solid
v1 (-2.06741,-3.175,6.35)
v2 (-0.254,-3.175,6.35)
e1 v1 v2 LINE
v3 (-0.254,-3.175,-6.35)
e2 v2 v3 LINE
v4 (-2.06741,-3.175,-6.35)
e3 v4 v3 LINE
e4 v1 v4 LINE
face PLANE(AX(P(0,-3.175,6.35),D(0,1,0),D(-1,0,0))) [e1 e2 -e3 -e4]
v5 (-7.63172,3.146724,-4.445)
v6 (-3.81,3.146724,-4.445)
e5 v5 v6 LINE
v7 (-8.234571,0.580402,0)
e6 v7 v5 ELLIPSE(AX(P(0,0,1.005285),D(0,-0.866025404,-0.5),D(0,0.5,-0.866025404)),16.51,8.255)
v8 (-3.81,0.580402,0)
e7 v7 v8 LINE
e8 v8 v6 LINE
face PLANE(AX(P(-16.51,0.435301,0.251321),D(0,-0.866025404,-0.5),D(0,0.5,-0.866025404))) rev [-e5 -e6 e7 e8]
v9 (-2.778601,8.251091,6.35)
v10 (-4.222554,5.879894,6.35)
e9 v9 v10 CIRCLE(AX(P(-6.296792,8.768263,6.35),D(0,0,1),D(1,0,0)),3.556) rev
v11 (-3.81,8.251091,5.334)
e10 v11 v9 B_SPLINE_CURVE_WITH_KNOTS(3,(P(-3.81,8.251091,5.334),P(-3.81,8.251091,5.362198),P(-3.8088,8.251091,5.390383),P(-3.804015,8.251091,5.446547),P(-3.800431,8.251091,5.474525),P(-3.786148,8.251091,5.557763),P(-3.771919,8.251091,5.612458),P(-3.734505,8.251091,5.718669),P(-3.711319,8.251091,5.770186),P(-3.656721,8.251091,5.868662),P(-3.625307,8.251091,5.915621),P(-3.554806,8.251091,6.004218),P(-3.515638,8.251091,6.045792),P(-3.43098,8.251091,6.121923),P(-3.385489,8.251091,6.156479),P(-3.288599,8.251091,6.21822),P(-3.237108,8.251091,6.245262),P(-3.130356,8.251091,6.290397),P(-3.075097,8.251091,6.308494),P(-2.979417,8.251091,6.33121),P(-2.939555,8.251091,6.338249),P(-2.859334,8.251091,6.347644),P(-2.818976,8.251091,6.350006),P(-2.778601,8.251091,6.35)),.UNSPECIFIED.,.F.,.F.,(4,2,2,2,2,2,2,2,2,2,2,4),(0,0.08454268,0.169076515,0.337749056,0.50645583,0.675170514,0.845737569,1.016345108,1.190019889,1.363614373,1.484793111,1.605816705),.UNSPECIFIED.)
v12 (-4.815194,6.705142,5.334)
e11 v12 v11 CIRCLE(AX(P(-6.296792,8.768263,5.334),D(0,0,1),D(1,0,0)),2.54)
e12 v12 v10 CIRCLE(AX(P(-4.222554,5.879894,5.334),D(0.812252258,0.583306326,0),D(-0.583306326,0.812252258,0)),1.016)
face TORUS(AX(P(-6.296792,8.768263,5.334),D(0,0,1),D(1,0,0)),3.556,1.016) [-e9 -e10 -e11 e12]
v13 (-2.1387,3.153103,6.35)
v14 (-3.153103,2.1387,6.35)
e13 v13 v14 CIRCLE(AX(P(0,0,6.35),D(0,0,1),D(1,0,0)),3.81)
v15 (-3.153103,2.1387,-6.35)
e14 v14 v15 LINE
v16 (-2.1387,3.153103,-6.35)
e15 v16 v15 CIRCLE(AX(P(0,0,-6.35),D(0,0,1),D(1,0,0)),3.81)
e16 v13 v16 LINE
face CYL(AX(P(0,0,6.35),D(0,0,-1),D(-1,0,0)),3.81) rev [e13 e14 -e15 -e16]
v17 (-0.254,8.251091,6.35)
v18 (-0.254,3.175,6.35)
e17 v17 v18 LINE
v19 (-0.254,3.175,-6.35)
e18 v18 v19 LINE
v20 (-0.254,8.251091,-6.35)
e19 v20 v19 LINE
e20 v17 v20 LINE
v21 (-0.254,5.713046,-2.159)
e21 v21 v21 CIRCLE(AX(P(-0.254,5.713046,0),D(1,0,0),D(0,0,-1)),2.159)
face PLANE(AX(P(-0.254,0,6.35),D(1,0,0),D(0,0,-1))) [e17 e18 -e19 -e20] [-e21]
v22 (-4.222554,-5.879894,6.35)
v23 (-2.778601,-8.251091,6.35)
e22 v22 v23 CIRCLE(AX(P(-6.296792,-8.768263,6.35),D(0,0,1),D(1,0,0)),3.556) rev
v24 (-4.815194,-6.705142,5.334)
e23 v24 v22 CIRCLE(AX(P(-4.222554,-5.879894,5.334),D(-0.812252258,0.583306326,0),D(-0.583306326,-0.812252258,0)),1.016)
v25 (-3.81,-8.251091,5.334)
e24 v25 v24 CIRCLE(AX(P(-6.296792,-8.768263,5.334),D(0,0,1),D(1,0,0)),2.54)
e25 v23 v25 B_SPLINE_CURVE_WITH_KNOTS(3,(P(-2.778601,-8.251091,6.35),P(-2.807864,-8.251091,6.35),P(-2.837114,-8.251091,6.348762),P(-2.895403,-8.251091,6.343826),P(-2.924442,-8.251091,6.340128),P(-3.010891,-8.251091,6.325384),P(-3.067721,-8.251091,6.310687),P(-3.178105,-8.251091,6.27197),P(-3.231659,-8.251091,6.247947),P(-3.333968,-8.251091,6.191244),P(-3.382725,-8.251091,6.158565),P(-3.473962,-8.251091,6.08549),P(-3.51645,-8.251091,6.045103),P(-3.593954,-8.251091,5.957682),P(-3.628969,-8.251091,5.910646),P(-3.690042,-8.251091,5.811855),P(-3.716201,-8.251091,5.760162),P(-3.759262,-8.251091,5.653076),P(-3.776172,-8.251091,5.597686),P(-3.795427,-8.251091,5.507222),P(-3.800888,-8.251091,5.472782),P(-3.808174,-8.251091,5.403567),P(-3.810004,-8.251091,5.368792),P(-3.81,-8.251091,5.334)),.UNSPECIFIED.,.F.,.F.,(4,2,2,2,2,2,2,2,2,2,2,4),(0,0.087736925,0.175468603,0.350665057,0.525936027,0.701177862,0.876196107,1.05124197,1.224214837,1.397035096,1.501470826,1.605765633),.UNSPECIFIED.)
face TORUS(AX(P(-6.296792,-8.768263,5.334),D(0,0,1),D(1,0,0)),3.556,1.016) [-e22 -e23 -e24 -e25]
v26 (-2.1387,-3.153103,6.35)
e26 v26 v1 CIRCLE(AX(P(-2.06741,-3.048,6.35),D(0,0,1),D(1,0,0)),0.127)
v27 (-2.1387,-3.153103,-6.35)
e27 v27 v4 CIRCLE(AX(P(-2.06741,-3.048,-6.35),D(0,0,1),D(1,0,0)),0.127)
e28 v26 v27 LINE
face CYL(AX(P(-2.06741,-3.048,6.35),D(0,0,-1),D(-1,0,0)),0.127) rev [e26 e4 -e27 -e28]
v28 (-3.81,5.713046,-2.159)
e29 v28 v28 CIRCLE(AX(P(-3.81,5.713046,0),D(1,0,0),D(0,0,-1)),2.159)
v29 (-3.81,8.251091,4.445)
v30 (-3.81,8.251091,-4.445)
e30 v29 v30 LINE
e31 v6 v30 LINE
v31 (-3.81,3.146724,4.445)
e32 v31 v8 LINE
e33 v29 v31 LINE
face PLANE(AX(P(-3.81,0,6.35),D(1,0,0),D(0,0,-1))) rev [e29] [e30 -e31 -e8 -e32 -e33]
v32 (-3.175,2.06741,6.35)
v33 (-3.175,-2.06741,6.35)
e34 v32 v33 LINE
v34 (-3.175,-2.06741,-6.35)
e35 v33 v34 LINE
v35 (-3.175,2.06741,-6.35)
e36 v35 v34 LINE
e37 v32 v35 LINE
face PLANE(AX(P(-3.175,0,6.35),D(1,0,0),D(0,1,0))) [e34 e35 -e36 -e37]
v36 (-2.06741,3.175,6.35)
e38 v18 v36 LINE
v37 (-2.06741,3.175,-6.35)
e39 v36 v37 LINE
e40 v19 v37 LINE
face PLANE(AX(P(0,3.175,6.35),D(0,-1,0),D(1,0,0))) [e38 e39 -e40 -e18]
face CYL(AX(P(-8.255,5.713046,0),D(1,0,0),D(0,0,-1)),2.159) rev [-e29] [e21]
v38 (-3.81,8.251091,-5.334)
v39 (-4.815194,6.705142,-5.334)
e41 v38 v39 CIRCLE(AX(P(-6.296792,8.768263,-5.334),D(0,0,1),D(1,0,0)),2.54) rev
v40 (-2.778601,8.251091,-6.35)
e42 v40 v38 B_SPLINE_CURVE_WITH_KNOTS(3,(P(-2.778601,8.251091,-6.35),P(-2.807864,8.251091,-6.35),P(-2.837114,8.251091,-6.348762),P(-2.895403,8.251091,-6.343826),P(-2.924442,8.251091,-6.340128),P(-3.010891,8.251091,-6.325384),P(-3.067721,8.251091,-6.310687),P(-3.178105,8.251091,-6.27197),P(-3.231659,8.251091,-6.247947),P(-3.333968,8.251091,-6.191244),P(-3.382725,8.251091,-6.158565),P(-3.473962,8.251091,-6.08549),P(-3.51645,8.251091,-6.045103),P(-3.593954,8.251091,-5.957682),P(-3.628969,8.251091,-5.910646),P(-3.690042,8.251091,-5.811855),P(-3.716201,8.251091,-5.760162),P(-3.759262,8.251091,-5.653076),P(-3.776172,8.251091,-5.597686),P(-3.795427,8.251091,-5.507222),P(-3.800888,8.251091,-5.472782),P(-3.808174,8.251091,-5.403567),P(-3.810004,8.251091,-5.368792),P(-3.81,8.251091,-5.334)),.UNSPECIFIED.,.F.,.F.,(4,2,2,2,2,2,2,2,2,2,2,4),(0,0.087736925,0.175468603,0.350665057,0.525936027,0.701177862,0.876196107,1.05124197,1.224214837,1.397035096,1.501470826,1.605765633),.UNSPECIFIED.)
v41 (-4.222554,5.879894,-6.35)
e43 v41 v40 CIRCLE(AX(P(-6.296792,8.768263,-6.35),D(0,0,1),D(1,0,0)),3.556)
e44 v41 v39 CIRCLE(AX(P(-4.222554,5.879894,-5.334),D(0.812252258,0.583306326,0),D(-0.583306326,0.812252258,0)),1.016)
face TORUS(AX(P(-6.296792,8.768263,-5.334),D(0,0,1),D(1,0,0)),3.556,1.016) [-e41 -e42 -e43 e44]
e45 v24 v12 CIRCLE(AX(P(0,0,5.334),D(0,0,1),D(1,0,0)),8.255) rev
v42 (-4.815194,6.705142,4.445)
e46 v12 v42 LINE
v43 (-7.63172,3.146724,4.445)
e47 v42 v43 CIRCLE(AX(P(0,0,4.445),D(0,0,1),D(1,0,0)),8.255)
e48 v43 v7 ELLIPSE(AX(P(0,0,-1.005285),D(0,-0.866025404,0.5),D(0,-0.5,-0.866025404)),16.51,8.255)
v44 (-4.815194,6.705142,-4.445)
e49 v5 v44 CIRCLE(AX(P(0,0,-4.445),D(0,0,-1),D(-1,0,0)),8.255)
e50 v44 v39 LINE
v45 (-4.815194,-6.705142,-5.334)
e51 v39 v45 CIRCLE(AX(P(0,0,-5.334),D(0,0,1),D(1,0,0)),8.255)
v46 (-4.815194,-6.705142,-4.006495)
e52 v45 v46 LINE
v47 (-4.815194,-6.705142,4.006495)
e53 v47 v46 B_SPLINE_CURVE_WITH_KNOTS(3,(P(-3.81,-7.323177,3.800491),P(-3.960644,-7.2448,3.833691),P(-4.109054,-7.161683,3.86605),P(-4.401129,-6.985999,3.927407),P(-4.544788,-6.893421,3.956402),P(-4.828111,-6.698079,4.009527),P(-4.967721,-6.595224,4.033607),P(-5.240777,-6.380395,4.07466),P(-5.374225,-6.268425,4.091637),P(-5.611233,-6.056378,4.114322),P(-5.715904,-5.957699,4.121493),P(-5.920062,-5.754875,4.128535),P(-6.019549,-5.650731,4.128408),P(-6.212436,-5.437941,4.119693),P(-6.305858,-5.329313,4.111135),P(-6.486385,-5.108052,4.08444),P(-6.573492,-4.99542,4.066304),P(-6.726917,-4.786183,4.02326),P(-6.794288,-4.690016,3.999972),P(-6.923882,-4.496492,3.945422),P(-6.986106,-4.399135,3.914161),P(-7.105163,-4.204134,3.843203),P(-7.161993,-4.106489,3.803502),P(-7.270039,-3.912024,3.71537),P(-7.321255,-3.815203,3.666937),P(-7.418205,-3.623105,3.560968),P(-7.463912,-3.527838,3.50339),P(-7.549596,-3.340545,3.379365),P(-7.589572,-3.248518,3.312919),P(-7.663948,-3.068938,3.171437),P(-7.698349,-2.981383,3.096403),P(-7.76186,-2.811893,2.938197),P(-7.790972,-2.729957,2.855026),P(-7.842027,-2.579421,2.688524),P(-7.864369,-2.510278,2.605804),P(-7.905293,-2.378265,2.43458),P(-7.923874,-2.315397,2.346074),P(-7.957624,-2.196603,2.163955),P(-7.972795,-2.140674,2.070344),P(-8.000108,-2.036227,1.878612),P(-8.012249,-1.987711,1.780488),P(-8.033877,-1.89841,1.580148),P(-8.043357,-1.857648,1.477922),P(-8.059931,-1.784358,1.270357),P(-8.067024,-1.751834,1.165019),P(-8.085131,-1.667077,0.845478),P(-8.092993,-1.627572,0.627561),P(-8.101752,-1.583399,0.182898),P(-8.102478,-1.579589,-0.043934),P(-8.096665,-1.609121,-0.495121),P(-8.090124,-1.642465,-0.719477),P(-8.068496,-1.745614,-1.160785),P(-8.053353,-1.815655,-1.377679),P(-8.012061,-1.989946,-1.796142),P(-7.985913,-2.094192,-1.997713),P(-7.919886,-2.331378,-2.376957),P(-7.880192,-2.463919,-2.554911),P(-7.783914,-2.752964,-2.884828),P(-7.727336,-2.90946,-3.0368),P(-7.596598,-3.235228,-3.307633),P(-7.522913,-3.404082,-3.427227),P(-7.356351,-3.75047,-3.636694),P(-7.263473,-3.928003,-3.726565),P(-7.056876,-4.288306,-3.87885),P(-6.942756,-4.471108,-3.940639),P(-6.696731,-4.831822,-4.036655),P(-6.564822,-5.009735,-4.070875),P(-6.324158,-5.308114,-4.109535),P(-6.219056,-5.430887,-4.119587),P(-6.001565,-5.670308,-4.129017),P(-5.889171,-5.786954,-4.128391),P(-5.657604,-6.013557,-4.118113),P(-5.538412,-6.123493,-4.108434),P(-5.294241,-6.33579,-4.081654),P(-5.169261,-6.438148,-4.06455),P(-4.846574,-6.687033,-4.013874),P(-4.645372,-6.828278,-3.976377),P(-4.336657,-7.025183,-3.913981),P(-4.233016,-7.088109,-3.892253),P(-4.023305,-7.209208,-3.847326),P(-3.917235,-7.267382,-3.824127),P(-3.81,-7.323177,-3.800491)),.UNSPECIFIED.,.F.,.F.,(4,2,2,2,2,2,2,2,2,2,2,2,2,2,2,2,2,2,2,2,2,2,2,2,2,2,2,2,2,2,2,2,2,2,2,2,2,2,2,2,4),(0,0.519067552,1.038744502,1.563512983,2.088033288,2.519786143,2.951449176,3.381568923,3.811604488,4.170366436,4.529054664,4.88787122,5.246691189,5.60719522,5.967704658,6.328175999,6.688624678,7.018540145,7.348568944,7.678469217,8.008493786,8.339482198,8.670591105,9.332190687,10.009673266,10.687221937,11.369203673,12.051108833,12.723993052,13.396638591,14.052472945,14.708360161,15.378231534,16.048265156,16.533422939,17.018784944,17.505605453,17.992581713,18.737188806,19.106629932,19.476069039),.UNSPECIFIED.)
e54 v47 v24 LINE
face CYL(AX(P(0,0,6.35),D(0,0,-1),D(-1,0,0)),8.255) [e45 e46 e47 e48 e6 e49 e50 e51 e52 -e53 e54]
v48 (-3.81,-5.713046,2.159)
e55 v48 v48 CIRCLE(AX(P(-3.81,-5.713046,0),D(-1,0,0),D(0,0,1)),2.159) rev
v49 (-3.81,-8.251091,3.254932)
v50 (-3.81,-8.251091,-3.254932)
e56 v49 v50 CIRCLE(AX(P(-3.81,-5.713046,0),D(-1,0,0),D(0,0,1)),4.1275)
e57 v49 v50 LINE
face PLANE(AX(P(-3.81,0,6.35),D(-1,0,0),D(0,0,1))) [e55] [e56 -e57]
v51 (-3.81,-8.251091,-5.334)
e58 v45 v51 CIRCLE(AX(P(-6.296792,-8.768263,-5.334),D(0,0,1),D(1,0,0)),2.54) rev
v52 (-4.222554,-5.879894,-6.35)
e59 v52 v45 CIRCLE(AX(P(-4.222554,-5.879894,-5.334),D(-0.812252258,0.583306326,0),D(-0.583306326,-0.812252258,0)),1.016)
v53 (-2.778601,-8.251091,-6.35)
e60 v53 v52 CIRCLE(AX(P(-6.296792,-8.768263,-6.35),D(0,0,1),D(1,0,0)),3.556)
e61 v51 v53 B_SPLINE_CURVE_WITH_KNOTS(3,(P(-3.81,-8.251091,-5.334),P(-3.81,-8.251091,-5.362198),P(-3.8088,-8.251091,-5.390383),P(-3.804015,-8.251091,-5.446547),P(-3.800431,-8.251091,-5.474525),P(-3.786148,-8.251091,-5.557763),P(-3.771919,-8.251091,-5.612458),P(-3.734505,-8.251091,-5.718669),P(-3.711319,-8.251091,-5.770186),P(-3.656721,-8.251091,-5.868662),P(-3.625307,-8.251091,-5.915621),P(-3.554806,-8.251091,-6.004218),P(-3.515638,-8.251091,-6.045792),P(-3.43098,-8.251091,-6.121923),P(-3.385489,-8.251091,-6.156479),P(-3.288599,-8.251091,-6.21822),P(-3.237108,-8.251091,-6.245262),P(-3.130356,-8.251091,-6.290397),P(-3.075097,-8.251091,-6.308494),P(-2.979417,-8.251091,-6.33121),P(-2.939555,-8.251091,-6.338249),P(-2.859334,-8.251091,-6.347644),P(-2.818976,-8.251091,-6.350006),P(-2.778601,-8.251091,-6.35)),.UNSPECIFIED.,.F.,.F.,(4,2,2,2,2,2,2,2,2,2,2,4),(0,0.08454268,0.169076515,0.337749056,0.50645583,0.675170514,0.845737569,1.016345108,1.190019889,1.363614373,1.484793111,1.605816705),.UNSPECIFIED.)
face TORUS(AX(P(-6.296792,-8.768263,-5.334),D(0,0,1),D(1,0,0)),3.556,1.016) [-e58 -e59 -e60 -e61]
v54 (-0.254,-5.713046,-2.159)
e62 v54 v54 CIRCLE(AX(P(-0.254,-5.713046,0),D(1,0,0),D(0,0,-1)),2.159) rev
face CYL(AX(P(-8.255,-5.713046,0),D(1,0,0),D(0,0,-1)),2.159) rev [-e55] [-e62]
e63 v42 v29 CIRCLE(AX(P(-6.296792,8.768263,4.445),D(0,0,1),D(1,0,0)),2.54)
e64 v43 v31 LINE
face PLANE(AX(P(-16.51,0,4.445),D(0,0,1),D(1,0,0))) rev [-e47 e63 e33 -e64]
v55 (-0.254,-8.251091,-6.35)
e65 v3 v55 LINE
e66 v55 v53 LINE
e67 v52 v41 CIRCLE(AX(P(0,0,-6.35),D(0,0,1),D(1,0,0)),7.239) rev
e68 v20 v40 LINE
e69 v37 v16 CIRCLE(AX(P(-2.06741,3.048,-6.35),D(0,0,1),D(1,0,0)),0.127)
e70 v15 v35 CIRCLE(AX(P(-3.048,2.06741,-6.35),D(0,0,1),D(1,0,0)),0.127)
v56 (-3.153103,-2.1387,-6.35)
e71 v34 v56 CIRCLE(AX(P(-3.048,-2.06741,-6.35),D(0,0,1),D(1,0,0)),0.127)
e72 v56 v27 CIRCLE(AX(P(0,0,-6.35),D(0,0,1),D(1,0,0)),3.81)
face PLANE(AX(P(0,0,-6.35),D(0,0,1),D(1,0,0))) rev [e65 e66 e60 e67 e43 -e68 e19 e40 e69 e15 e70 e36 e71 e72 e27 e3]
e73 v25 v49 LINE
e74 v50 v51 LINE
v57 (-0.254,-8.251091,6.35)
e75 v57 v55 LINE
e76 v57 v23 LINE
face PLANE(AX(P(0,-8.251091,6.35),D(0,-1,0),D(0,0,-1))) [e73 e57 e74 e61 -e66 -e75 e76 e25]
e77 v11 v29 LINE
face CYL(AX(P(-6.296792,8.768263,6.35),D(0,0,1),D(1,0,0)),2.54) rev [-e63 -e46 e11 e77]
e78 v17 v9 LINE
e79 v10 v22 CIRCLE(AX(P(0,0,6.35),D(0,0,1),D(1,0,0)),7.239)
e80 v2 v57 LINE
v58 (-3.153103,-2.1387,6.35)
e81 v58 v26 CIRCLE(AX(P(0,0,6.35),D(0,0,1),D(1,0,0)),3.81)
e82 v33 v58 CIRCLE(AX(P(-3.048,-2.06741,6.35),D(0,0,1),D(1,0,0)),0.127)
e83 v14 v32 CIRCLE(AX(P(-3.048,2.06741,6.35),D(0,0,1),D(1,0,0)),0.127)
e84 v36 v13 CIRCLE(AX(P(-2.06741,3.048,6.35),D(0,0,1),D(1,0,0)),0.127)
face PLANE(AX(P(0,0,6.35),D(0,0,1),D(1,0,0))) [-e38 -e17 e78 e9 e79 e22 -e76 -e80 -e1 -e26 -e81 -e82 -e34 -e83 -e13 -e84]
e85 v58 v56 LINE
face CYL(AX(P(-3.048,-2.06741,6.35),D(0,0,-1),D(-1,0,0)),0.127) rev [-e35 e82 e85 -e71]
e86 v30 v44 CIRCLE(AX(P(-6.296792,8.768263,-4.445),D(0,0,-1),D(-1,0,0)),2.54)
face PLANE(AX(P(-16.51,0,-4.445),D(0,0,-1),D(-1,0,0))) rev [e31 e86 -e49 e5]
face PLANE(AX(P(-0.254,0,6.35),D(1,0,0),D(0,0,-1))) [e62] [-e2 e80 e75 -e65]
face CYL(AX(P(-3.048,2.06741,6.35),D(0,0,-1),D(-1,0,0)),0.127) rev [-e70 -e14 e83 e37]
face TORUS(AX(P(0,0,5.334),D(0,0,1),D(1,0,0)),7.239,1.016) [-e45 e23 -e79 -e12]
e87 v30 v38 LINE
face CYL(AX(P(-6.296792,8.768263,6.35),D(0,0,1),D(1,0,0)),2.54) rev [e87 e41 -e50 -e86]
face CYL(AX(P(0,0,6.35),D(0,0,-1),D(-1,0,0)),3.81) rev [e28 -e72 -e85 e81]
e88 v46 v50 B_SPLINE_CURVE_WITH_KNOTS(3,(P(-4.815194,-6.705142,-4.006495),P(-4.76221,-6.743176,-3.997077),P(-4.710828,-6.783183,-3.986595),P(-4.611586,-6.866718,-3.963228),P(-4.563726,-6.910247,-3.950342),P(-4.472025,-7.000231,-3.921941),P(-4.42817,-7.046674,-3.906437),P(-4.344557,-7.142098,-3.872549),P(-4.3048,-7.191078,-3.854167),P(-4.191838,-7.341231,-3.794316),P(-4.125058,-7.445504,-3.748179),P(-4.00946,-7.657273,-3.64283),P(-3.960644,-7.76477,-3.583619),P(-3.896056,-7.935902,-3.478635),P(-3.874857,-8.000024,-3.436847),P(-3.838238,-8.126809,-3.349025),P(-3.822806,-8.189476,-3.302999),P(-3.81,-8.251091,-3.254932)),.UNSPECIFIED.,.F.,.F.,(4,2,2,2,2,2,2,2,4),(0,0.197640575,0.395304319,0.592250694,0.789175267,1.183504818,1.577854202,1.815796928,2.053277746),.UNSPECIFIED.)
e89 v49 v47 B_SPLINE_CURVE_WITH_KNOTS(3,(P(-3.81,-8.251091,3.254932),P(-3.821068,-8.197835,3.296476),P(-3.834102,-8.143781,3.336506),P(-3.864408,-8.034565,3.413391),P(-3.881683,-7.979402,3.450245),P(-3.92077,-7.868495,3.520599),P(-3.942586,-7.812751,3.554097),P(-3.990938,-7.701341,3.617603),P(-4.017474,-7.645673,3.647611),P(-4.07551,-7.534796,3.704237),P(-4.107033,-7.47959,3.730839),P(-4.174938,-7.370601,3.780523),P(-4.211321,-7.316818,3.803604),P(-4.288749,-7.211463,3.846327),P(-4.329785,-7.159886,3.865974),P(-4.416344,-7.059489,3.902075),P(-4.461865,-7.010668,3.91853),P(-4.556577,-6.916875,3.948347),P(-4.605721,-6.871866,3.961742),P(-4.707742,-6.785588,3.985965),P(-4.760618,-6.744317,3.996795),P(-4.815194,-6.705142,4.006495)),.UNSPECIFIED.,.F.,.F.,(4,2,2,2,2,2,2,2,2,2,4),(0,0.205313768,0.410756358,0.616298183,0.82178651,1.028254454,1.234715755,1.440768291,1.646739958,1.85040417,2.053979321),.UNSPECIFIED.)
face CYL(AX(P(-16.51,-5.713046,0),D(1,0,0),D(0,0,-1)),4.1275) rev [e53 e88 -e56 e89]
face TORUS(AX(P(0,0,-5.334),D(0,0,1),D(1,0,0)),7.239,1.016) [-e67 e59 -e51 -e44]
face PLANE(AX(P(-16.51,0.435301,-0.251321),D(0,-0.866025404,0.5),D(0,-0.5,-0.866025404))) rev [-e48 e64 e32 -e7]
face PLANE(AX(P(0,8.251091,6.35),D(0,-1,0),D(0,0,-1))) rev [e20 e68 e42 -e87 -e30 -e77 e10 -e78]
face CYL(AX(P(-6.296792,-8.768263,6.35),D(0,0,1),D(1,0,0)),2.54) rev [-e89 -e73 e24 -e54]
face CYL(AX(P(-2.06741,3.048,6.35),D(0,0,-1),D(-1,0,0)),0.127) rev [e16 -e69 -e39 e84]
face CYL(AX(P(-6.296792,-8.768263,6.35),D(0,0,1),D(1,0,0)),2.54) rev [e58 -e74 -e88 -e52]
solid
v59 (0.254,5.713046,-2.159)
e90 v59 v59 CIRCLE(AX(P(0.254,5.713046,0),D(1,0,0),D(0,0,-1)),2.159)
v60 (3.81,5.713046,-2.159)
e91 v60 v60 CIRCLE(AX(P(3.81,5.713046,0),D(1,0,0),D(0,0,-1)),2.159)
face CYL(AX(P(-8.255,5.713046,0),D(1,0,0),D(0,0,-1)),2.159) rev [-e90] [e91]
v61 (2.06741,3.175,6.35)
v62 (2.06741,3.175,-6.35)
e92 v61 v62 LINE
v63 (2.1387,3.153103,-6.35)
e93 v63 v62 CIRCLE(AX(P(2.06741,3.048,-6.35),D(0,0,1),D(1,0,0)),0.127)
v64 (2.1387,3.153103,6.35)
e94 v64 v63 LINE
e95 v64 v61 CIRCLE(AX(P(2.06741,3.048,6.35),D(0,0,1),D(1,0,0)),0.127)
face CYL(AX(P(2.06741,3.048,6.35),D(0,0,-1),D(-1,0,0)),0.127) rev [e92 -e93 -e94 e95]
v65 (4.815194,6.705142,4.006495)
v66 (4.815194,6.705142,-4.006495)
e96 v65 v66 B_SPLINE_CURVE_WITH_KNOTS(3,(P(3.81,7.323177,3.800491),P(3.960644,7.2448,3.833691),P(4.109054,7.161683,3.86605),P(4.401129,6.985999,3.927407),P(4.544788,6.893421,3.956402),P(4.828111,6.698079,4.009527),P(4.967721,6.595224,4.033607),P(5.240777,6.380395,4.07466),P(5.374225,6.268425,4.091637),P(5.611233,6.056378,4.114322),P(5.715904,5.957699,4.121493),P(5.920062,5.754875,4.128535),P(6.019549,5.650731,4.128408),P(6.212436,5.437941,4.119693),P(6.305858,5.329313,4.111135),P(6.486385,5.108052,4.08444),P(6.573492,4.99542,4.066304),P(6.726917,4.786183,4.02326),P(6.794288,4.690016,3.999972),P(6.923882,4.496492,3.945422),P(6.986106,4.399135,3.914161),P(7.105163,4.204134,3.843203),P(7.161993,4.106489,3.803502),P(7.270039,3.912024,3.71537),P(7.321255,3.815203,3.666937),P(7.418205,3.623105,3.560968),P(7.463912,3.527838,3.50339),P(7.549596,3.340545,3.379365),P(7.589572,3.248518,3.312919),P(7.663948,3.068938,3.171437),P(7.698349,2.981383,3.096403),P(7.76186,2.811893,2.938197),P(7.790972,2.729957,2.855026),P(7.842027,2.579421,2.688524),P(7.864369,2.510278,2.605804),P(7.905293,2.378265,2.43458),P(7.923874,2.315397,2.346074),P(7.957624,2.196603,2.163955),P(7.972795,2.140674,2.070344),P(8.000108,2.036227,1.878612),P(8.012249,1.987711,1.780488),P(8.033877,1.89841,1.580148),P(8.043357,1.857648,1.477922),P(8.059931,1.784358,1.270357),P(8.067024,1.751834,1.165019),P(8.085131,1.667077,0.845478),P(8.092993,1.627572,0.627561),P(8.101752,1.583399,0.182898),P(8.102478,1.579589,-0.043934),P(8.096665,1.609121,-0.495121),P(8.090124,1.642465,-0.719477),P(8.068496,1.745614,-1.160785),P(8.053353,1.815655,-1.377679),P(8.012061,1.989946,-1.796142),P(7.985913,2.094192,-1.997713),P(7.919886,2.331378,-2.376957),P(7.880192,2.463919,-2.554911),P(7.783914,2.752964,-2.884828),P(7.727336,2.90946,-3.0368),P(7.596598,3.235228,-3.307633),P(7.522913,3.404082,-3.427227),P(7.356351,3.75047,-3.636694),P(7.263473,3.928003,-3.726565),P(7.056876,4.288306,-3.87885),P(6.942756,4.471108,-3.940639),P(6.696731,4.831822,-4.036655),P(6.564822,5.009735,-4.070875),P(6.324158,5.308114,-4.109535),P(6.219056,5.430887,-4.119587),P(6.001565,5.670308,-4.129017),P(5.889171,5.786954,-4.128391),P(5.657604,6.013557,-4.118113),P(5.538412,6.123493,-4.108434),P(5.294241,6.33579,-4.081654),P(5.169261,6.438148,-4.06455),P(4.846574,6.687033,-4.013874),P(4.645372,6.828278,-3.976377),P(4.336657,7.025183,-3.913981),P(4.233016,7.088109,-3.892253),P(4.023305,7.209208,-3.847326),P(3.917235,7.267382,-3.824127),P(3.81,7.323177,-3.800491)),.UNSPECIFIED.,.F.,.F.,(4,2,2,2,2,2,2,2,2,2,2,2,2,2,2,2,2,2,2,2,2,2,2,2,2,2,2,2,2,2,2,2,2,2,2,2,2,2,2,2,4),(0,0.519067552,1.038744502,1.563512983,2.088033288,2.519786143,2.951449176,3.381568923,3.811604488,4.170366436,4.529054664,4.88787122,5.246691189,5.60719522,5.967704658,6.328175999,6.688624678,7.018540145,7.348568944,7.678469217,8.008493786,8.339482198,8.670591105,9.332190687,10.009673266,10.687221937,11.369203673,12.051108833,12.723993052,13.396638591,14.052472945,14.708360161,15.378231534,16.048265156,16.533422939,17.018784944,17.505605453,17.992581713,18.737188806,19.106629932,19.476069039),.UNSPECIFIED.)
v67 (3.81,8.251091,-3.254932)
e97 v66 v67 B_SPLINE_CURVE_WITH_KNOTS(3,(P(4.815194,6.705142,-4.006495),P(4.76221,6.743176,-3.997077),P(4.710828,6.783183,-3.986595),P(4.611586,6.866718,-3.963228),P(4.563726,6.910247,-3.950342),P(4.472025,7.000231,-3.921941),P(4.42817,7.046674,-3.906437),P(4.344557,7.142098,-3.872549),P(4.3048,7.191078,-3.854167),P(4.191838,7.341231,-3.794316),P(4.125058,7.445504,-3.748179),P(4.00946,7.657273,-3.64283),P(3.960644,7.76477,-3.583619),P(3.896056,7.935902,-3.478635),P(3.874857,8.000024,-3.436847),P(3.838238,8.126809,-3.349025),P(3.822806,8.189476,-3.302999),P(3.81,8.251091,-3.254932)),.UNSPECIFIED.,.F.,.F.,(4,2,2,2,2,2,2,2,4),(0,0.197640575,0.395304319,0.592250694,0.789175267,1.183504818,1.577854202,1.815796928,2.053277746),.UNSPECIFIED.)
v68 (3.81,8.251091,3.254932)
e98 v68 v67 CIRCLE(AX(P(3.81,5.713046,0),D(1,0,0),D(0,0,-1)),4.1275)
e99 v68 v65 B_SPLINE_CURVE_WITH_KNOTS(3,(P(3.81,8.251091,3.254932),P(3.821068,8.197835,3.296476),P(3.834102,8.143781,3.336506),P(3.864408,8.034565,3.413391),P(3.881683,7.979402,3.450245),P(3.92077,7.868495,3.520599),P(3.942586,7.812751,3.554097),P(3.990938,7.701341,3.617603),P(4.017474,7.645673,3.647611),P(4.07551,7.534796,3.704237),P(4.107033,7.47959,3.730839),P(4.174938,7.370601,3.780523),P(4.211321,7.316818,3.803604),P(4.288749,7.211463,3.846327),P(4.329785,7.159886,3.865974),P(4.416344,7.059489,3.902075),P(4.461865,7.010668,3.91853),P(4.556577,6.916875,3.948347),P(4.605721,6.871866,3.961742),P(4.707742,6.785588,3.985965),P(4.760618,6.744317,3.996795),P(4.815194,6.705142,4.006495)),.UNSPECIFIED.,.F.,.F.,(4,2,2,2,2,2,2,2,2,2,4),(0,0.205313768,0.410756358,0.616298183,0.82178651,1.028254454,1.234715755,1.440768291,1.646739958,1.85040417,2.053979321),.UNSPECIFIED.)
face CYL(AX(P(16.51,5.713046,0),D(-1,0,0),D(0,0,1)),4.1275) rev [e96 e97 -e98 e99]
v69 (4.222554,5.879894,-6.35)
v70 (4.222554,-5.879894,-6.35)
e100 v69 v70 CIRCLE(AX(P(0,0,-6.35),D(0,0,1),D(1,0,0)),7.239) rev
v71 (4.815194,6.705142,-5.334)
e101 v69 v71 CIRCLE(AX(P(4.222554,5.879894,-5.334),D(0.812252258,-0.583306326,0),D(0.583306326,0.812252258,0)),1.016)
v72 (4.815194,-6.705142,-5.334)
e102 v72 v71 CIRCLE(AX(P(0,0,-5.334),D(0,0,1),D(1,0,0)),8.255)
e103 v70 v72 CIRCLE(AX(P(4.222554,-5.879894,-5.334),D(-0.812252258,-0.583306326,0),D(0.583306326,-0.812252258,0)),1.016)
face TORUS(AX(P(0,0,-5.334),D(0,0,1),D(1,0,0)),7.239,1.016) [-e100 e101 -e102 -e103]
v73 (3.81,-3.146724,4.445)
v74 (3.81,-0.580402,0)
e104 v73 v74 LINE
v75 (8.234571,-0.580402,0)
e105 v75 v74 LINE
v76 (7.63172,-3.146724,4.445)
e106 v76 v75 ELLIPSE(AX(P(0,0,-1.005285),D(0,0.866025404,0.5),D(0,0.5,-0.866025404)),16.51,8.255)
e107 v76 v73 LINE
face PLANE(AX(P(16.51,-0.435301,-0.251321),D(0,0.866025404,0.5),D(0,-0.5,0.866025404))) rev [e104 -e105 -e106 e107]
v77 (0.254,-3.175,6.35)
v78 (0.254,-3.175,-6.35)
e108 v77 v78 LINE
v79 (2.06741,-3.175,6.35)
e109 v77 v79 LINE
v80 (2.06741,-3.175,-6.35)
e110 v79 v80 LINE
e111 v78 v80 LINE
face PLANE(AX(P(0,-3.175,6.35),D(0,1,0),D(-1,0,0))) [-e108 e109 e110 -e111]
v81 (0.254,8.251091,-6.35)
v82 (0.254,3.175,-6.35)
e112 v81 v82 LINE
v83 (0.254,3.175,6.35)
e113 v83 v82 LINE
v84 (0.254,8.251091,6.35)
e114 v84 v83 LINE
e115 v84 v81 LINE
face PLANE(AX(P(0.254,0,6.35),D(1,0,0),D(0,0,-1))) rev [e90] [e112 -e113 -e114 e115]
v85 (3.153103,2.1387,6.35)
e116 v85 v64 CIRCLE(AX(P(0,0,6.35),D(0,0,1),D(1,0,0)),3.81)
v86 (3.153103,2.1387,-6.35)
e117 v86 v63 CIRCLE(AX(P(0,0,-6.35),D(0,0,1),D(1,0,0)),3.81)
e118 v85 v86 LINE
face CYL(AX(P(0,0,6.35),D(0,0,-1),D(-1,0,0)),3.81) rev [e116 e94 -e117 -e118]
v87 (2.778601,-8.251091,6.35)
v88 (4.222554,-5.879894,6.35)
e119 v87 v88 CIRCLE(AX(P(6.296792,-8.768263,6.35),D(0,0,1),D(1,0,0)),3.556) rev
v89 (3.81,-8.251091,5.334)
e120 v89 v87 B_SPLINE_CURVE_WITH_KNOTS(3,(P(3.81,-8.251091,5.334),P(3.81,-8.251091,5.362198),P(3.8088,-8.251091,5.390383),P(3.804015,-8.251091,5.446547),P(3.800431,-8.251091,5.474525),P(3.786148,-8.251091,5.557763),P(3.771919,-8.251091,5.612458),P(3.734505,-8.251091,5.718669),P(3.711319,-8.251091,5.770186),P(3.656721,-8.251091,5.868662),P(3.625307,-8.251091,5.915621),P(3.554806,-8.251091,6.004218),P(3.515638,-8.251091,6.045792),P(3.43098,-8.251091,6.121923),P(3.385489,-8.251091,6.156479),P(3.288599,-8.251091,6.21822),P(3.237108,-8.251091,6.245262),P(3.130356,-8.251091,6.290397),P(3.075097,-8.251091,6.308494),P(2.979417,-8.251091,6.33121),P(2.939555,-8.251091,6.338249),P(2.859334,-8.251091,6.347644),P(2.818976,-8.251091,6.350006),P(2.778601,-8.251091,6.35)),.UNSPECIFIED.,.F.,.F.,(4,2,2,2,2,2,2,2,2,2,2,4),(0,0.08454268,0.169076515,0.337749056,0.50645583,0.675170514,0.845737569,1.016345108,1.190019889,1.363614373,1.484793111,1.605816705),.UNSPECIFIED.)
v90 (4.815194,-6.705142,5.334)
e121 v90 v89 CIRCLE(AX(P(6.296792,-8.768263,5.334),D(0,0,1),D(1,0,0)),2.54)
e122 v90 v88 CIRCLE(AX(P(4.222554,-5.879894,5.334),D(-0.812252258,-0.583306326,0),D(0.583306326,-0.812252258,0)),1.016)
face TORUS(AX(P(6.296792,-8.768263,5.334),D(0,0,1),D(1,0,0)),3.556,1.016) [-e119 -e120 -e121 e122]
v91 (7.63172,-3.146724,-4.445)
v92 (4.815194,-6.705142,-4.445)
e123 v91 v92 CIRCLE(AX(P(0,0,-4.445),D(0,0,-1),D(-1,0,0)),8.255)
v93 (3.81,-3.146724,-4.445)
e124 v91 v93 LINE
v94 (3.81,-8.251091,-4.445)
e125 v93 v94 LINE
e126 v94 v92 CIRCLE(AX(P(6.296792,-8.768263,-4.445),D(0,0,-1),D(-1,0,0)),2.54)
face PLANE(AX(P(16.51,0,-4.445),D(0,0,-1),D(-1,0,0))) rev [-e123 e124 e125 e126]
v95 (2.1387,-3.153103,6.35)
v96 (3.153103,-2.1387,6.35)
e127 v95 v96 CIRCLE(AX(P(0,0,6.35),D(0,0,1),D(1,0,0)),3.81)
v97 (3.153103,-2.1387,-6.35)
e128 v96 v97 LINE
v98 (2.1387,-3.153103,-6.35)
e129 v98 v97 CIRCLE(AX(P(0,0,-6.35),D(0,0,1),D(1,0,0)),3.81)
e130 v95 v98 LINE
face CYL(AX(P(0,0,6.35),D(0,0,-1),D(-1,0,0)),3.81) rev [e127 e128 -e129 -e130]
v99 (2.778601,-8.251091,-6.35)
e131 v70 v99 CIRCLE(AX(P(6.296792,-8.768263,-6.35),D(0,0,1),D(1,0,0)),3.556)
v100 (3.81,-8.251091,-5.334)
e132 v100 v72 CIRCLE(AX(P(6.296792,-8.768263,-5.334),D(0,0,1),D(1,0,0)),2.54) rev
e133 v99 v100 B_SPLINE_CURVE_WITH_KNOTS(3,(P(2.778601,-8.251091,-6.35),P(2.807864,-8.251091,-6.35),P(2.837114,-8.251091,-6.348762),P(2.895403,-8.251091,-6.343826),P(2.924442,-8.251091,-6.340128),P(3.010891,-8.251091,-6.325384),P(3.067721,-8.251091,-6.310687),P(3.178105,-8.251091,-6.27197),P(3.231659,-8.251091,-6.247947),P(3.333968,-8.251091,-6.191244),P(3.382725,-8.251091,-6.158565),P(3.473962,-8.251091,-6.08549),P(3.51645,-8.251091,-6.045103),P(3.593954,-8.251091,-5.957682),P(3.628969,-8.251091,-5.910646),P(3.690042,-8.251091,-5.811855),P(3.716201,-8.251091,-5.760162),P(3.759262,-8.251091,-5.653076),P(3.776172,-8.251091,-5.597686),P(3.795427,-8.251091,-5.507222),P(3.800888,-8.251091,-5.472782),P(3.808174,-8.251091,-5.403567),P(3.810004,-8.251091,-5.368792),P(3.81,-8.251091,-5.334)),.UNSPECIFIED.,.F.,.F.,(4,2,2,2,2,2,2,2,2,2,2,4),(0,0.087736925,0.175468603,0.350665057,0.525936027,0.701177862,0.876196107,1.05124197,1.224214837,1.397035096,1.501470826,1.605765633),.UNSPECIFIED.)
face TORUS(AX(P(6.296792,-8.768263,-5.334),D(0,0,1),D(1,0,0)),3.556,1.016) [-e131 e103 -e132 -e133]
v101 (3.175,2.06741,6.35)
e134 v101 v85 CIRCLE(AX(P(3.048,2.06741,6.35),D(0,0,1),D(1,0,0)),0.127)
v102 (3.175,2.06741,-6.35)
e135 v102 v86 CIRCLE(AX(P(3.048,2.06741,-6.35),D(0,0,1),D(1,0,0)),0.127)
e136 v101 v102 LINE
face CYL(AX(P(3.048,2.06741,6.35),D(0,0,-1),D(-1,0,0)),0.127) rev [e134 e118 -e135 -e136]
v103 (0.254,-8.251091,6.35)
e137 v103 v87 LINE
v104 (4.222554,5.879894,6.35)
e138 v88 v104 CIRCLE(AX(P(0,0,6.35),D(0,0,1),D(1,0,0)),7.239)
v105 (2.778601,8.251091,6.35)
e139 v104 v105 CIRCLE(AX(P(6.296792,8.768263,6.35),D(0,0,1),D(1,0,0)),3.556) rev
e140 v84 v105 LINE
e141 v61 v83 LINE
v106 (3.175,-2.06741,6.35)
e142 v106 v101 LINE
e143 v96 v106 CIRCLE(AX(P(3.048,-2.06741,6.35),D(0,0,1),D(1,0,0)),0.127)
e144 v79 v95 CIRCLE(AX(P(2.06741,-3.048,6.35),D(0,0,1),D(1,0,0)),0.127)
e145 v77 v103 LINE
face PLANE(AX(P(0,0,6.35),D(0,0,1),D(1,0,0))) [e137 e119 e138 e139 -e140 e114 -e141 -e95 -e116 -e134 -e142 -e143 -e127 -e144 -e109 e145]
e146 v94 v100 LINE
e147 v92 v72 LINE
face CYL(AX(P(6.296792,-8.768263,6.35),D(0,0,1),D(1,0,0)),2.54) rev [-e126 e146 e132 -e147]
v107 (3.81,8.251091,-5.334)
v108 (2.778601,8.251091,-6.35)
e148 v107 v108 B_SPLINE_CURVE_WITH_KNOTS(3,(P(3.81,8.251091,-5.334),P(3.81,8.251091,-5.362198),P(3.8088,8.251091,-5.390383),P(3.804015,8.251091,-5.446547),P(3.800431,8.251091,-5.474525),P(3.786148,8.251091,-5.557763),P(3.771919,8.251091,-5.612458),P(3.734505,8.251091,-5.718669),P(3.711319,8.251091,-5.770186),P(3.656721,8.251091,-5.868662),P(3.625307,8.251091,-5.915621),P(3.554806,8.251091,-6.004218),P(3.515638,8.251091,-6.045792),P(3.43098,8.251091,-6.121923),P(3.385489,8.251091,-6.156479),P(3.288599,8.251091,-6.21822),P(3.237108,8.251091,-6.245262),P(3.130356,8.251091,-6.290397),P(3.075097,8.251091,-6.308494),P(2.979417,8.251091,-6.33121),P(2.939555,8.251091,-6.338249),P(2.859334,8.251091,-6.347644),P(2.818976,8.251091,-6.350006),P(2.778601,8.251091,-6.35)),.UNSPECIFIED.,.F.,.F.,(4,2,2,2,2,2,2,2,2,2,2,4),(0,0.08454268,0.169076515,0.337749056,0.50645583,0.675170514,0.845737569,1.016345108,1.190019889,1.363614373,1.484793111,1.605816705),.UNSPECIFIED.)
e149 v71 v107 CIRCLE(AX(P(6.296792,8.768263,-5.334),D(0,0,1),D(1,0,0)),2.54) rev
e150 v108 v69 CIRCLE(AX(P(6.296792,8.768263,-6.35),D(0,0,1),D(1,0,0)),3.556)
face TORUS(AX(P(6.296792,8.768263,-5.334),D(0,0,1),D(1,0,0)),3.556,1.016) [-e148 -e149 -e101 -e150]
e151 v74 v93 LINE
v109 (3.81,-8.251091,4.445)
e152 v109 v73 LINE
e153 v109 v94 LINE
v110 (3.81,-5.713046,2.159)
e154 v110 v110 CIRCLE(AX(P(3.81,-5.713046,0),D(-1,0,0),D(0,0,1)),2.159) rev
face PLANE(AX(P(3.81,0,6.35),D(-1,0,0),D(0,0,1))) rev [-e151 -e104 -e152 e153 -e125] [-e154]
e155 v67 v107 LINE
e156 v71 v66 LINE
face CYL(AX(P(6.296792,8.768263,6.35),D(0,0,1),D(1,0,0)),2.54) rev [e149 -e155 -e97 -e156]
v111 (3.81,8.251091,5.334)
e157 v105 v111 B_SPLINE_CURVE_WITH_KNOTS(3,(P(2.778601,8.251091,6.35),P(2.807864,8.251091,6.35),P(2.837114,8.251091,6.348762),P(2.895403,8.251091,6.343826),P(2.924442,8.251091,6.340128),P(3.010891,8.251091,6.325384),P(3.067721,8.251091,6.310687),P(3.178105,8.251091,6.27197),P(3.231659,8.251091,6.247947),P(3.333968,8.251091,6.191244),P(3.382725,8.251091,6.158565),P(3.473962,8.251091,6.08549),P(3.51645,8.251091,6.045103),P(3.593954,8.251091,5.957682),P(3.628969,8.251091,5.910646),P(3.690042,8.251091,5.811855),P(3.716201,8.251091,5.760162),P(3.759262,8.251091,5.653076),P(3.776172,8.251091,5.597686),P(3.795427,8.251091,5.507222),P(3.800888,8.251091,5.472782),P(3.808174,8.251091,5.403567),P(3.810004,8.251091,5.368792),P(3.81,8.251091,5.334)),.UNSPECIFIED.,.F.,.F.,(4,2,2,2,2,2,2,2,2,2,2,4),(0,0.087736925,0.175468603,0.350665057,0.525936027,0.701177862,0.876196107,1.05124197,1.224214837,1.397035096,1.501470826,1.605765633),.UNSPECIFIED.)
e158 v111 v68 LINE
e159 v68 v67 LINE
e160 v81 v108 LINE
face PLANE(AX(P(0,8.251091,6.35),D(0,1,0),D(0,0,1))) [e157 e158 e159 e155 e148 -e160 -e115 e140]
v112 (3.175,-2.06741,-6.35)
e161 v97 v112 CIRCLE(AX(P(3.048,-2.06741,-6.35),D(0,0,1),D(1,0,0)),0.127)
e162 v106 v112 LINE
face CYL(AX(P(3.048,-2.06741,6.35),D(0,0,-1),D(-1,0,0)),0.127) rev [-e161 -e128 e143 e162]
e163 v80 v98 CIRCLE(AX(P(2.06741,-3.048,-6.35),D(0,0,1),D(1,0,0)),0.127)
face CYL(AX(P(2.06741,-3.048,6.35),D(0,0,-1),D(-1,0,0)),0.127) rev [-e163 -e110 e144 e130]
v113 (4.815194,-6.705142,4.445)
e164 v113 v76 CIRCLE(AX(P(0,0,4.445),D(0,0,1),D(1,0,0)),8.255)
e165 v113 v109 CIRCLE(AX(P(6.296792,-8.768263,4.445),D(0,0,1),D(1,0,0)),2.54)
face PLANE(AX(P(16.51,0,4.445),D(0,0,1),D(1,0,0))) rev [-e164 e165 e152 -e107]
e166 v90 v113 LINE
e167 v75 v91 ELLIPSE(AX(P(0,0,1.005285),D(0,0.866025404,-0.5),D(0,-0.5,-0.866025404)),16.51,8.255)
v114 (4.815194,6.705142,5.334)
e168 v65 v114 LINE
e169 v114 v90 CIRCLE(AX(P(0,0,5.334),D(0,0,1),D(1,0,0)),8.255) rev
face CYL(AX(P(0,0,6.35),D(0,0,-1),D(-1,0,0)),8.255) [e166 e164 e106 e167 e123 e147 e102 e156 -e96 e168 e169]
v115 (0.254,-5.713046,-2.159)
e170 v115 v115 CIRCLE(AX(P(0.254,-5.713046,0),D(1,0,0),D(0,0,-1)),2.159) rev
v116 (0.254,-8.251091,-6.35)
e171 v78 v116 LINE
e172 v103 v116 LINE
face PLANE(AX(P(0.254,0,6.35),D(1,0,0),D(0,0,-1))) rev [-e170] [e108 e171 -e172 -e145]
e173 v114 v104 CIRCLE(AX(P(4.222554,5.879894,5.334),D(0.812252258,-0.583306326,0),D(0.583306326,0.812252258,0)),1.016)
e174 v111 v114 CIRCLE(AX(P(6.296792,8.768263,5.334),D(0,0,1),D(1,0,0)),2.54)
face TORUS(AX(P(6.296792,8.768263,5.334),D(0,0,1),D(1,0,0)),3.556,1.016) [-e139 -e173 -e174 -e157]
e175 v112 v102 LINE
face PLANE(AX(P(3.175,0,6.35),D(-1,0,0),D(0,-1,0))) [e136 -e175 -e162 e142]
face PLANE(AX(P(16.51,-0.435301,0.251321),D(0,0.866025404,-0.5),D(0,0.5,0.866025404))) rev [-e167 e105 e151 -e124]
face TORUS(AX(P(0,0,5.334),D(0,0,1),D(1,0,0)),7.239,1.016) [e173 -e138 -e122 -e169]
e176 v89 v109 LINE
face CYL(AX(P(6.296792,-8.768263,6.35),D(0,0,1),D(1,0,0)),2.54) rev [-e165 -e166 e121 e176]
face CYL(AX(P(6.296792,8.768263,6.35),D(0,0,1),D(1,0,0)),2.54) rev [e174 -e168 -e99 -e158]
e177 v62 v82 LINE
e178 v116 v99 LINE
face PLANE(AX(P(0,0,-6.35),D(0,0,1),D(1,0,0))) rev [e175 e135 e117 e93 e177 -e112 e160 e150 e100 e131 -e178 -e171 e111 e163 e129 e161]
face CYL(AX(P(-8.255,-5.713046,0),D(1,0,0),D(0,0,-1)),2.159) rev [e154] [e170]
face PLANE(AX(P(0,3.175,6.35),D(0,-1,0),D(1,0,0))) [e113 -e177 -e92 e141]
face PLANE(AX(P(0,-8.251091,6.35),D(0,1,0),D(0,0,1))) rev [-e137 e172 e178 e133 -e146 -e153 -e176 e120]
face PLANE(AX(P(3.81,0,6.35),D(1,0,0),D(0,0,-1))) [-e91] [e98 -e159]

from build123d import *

# Parameters (mm, degrees)
BOSS_EXTRUDE1_DEPTH     = 6.35
CUT_EXTRUDE1_DEPTH      = 14.446415507
CUT_EXTRUDE1_DEPTH_BACK = 14.446415507
SKETCH3_R               = 2.159
CUT_EXTRUDE2_START      = -3.81
SKETCH4_R               = 2.159
CUT_EXTRUDE2_DEPTH      = 12.7
CUT_EXTRUDE3_START      = 3.81
SKETCH4_4_R             = 2.159
CUT_EXTRUDE3_DEPTH      = 12.7
SKETCH6_R               = 4.1275
CUT_EXTRUDE4_DEPTH      = 12.7
SKETCH7_R               = 4.1275
CUT_EXTRUDE5_DEPTH      = 12.7
FILLET1_R               = 2.54
FILLET2_R               = 2.54
FILLET3_R               = 1.016
FILLET4_R               = 1.016


with BuildPart() as part:
    # Sketch2 → Boss-Extrude1 (new, symmetric)
    with BuildSketch(Plane.XY):
        with BuildLine():
            Line((-0.254, 3.175), (-0.254, 8.251091382))
            ThreePointArc((-0.254, 8.251091382), (-2.084293684, 7.987536844), (-3.81, 7.323177248))
            ThreePointArc((-3.81, 7.323177248), (-8.255, 0), (-3.81, -7.323177248))
            ThreePointArc((-3.81, -7.323177248), (-2.084293684, -7.987536844), (-0.254, -8.251091382))
            Line((-0.254, -8.251091382), (-0.254, -3.175))
            Line((-0.254, -3.175), (-2.067410216, -3.175))
            ThreePointArc((-2.067410216, -3.175), (-2.1046987, -3.169402508), (-2.138700223, -3.153103448))
            ThreePointArc((-2.138700223, -3.153103448), (-2.694076836, -2.694076836), (-3.153103448, -2.138700223))
            ThreePointArc((-3.153103448, -2.138700223), (-3.169402508, -2.1046987), (-3.175, -2.067410216))
            Line((-3.175, -2.067410216), (-3.175, 0))
            Line((-3.175, 0), (-3.175, 2.067410216))
            ThreePointArc((-3.175, 2.067410216), (-3.169402508, 2.1046987), (-3.153103448, 2.138700223))
            ThreePointArc((-3.153103448, 2.138700223), (-2.694076836, 2.694076836), (-2.138700223, 3.153103448))
            ThreePointArc((-2.138700223, 3.153103448), (-2.1046987, 3.169402508), (-2.067410216, 3.175))
            Line((-2.067410216, 3.175), (-0.254, 3.175))
        make_face()
        with BuildLine():
            ThreePointArc((3.81, 7.323177248), (2.084293684, 7.987536844), (0.254, 8.251091382))
            Line((0.254, 8.251091382), (0.254, 3.175))
            Line((0.254, 3.175), (2.067410216, 3.175))
            ThreePointArc((2.067410216, 3.175), (2.1046987, 3.169402508), (2.138700223, 3.153103448))
            ThreePointArc((2.138700223, 3.153103448), (2.694076836, 2.694076836), (3.153103448, 2.138700223))
            ThreePointArc((3.153103448, 2.138700223), (3.169402508, 2.1046987), (3.175, 2.067410216))
            Line((3.175, 2.067410216), (3.175, 0))
            Line((3.175, 0), (3.175, -2.067410216))
            ThreePointArc((3.175, -2.067410216), (3.169402508, -2.1046987), (3.153103448, -2.138700223))
            ThreePointArc((3.153103448, -2.138700223), (2.694076836, -2.694076836), (2.138700223, -3.153103448))
            ThreePointArc((2.138700223, -3.153103448), (2.1046987, -3.169402508), (2.067410216, -3.175))
            Line((2.067410216, -3.175), (0.254, -3.175))
            Line((0.254, -3.175), (0.254, -8.251091382))
            ThreePointArc((0.254, -8.251091382), (2.084293684, -7.987536844), (3.81, -7.323177248))
            ThreePointArc((3.81, -7.323177248), (7.05679017, -4.283309176), (8.255, 0))
            ThreePointArc((8.255, 0), (7.05679017, 4.283309176), (3.81, 7.323177248))
        make_face()
        with BuildLine():
            Line((3.81, 8.251091382), (0.254, 8.251091382))
            ThreePointArc((0.254, 8.251091382), (2.084293684, 7.987536844), (3.81, 7.323177248))
            Line((3.81, 7.323177248), (3.81, 8.251091382))
        make_face()
        with BuildLine():
            ThreePointArc((-3.81, 7.323177248), (-2.084293684, 7.987536844), (-0.254, 8.251091382))
            Line((-0.254, 8.251091382), (-3.81, 8.251091382))
            Line((-3.81, 8.251091382), (-3.81, 7.323177248))
        make_face()
        with BuildLine():
            ThreePointArc((-0.254, -8.251091382), (-2.084293684, -7.987536844), (-3.81, -7.323177248))
            Line((-3.81, -7.323177248), (-3.81, -8.251091382))
            Line((-3.81, -8.251091382), (-0.254, -8.251091382))
        make_face()
        with BuildLine():
            ThreePointArc((3.81, -7.323177248), (2.084293684, -7.987536844), (0.254, -8.251091382))
            Line((0.254, -8.251091382), (3.81, -8.251091382))
            Line((3.81, -8.251091382), (3.81, -7.323177248))
        make_face()
    extrude(amount=BOSS_EXTRUDE1_DEPTH, both=True)

    # Sketch3 → Cut-Extrude1 (cut, two sides: drawn at the far end of the back side and taken through both)
    with BuildSketch(Plane(origin=(-0.254, 0, 0), x_dir=(0, 0, -1), z_dir=(1, 0, 0)).offset(-CUT_EXTRUDE1_DEPTH_BACK)):
        with BuildLine():
            ThreePointArc((2.159, 5.713045691), (1.526643541, 7.239689232), (0, 7.872045691))
            Line((0, 7.872045691), (0, 3.554045691))
            ThreePointArc((0, 3.554045691), (1.526643541, 4.186402151), (2.159, 5.713045691))
        make_face()
        with BuildLine():
            Line((0, 3.554045691), (0, 7.872045691))
            ThreePointArc((0, 7.872045691), (-2.159, 5.713045691), (0, 3.554045691))
        make_face()
        with Locations((0, -5.713045691)):
            Circle(SKETCH3_R)
    extrude(amount=CUT_EXTRUDE1_DEPTH + CUT_EXTRUDE1_DEPTH_BACK, mode=Mode.SUBTRACT)

    # Sketch4 → Cut-Extrude2 (cut)
    with BuildSketch(Plane(origin=(0, 0, 0), x_dir=(0, 0, -1), z_dir=(1, 0, 0)).offset(CUT_EXTRUDE2_START)):
        Polygon((0, 10.845689584), (-4.445, 8.279367638), (-4.445, 3.146723745), (0, 0.580401798), (4.445, 3.146723745), (4.445, 8.279367638), align=None)
        with Locations((0, 5.713045691)):
            Circle(SKETCH4_R, mode=Mode.SUBTRACT)
    extrude(amount=-CUT_EXTRUDE2_DEPTH, mode=Mode.SUBTRACT)

    # Sketch4<4> → Cut-Extrude3 (cut)
    with BuildSketch(Plane(origin=(0, 0, 0), x_dir=(0, 0, -1), z_dir=(1, 0, 0)).offset(CUT_EXTRUDE3_START)):
        Polygon((0, -10.845689584), (-4.445, -8.279367638), (-4.445, -3.146723745), (0, -0.580401798), (4.445, -3.146723745), (4.445, -8.279367638), align=None)
        with Locations((0, -5.713045691)):
            Circle(SKETCH4_4_R, mode=Mode.SUBTRACT)
    extrude(amount=CUT_EXTRUDE3_DEPTH, mode=Mode.SUBTRACT)

    # Sketch6 → Cut-Extrude4 (cut)
    with BuildSketch(Plane(origin=(3.81, 0, 0), x_dir=(0, 0, -1), z_dir=(1, 0, 0))):
        with Locations((0, 5.713045691)):
            Circle(SKETCH6_R)
    extrude(amount=CUT_EXTRUDE4_DEPTH, mode=Mode.SUBTRACT)

    # Sketch7 → Cut-Extrude5 (cut)
    with BuildSketch(Plane.ZY.offset(3.81)):
        with Locations((0, -5.713045691)):
            Circle(SKETCH7_R)
    extrude(amount=CUT_EXTRUDE5_DEPTH, mode=Mode.SUBTRACT)

    # Fillet1
    # the kernel refuses this fillet: 2.54 mm, written as the material it adds along each edge
    with BuildSketch(Plane(origin=(-3.81, 7.323177248, -4.445), x_dir=(0, 1, 0), z_dir=(0, 0, -1)), Plane(origin=(-3.81, 7.323177248, 6.35), x_dir=(0, 1, 0), z_dir=(0, 0, -1))) as fillet1_piece_1:
        with BuildLine():
            CenterArc((1.445085875, -2.486791787), FILLET1_R, 101.748195792, 42.568374615)
            Line((-0.618034859, -1.005193719), (-0.659297274, -0.975561758))
            ThreePointArc((-0.659297274, -0.975561758), (-0.334308523, -0.487046845), (-0.045065706, 0.023446154))
            Line((-0.045065706, 0.023446154), (0, 0.0508))
            ThreePointArc((0, 0.0508), (0.463957067, 0.0508), (0.9175707, 0.049735836))
            Line((0.9175707, 0.049735836), (0.927914135, 0))
        make_face()
    extrude(amount=1.905)
    with BuildSketch(Plane(origin=(-3.81, -7.323177248, -6.35), x_dir=(-0.8518647430364081, 0.5237618347794293, 0), z_dir=(0, 0, 1))) as fillet1_piece_2_section:
        with BuildLine():
            CenterArc((1.361529417, 2.533504337), FILLET1_R, 223.333123714, 42.568374615)
            Line((-0.48600601, 0.790457336), (-0.522956718, 0.755596396))
            ThreePointArc((-0.522956718, 0.755596396), (-0.286277734, 0.368621567), (-0.043274729, -0.026607101))
            Line((-0.043274729, -0.026607101), (0.003630745, -0.050670087))
            ThreePointArc((0.003630745, -0.050670087), (0.589996081, -0.029689095), (1.176361416, -0.050670087))
            Line((1.176361416, -0.050670087), (1.179992161, 0))
        make_face()
    fillet1_piece_2 = extrude(amount=5.499489301, mode=Mode.PRIVATE)
    fillet1_piece_2 = fillet1_piece_2 - Plane(origin=(-4.034665627, -5.713045691, 0), x_dir=(0, 0, 1), z_dir=(1, 0, 0)) * Cylinder(4.1275, 16, mode=Mode.PRIVATE)
    add(fillet1_piece_2)
    with BuildSketch(Plane(origin=(-3.81, -7.323177248, 0.850510699), x_dir=(-0.8518647430364114, 0.5237618347794242, 0), z_dir=(0, 0, 1))) as fillet1_piece_3_section:
        with BuildLine():
            CenterArc((1.361529417, 2.533504337), FILLET1_R, 223.333123714, 42.568374615)
            Line((-0.48600601, 0.790457336), (-0.522956718, 0.755596396))
            ThreePointArc((-0.522956718, 0.755596396), (-0.286277734, 0.368621567), (-0.043274729, -0.026607101))
            Line((-0.043274729, -0.026607101), (0.003630745, -0.050670087))
            ThreePointArc((0.003630745, -0.050670087), (0.589996081, -0.029689095), (1.176361416, -0.050670087))
            Line((1.176361416, -0.050670087), (1.179992161, 0))
        make_face()
    fillet1_piece_3 = extrude(amount=5.499489301, mode=Mode.PRIVATE)
    fillet1_piece_3 = fillet1_piece_3 - Plane(origin=(-4.034665565, -5.713045691, 0), x_dir=(0, 0, 1), z_dir=(1, 0, 0)) * Cylinder(4.1275, 16, mode=Mode.PRIVATE)
    add(fillet1_piece_3)

    # Fillet2
    # the kernel refuses this fillet: 2.54 mm, written as the material it adds along each edge
    with BuildSketch(Plane(origin=(3.81, -7.323177248, 4.445), x_dir=(0, -1, 0), z_dir=(0, 0, 1))) as fillet2_piece_1:
        with BuildLine():
            CenterArc((1.445085875, 2.486791787), FILLET2_R, 215.683429593, 42.568374615)
            Line((-0.618034859, 1.005193719), (-0.659297274, 0.975561758))
            ThreePointArc((-0.659297274, 0.975561758), (-0.334308523, 0.487046845), (-0.045065706, -0.023446154))
            Line((-0.045065706, -0.023446154), (0, -0.0508))
            ThreePointArc((0, -0.0508), (0.463957067, -0.0508), (0.9175707, -0.049735836))
            Line((0.9175707, -0.049735836), (0.927914135, 0))
        make_face()
    extrude(amount=1.905)
    with BuildSketch(Plane(origin=(3.81, -7.323177248, -4.445), x_dir=(0.8518647430364108, 0.5237618347794248, 0), z_dir=(0, 0, -1))) as fillet2_piece_2:
        with BuildLine():
            CenterArc((1.361529417, 2.533504337), FILLET2_R, 223.333123714, 42.568374615)
            Line((-0.48600601, 0.790457336), (-0.522956718, 0.755596396))
            ThreePointArc((-0.522956718, 0.755596396), (-0.286277734, 0.368621567), (-0.043274729, -0.026607101))
            Line((-0.043274729, -0.026607101), (0.003630745, -0.050670087))
            ThreePointArc((0.003630745, -0.050670087), (0.589996081, -0.029689095), (1.176361416, -0.050670087))
            Line((1.176361416, -0.050670087), (1.179992161, 0))
        make_face()
    extrude(amount=1.905)
    with BuildSketch(Plane(origin=(3.81, 7.323177248, -0.850510699), x_dir=(0.8518647430364104, -0.5237618347794255, 0), z_dir=(0, 0, -1))) as fillet2_piece_3_section:
        with BuildLine():
            CenterArc((1.361529417, -2.533504337), FILLET2_R, 94.098501671, 42.568374615)
            Line((-0.48600601, -0.790457336), (-0.522956718, -0.755596396))
            ThreePointArc((-0.522956718, -0.755596396), (-0.286277734, -0.368621567), (-0.043274729, 0.026607101))
            Line((-0.043274729, 0.026607101), (0.003630745, 0.050670087))
            ThreePointArc((0.003630745, 0.050670087), (0.589996081, 0.029689095), (1.176361416, 0.050670087))
            Line((1.176361416, 0.050670087), (1.179992161, 0))
        make_face()
    fillet2_piece_3 = extrude(amount=5.499489301, mode=Mode.PRIVATE)
    fillet2_piece_3 = fillet2_piece_3 - Plane(origin=(4.034665627, 5.713045691, 0), x_dir=(0, 0, -1), z_dir=(-1, 0, 0)) * Cylinder(4.1275, 16, mode=Mode.PRIVATE)
    add(fillet2_piece_3)
    with BuildSketch(Plane(origin=(3.81, 7.323177248, 0.850510699), x_dir=(0, 1, 0), z_dir=(0, 0, 1))) as fillet2_piece_4_section:
        with BuildLine():
            CenterArc((1.445085875, -2.486791787), FILLET2_R, 101.748195792, 42.568374615)
            Line((-0.618034859, -1.005193719), (-0.659297274, -0.975561758))
            ThreePointArc((-0.659297274, -0.975561758), (-0.334308523, -0.487046845), (-0.045065706, 0.023446154))
            Line((-0.045065706, 0.023446154), (0, 0.0508))
            ThreePointArc((0, 0.0508), (0.463957067, 0.0508), (0.9175707, 0.049735836))
            Line((0.9175707, 0.049735836), (0.927914135, 0))
        make_face()
    fillet2_piece_4 = extrude(amount=5.499489301, mode=Mode.PRIVATE)
    fillet2_piece_4 = fillet2_piece_4 - Plane(origin=(4.034665565, 5.713045691, 0), x_dir=(0, 0, -1), z_dir=(-1, 0, 0)) * Cylinder(4.1275, 16, mode=Mode.PRIVATE)
    add(fillet2_piece_4)

    # Fillet3
    fillet3_edges = [part.edges().sort_by_distance(p)[0] for p in [
        (8.255, 0, 6.35),
        (8.255, 0, -6.35),
        (4.167350761, -7.383676211, 6.35),
        (4.167350761, -7.383676211, -6.35),
        (4.167350761, 7.383676211, 6.35),
        (4.167350761, 7.383676211, -6.35),
    ]]
    fillet(fillet3_edges, radius=FILLET3_R)

    # Fillet4
    fillet4_edges = [part.edges().sort_by_distance(p)[0] for p in [
        (-8.255, 0, 6.35),
        (-8.255, 0, -6.35),
        (-4.167350761, 7.383676211, -6.35),
        (-4.167350761, 7.383676211, 6.35),
        (-4.167350761, -7.383676211, 6.35),
        (-4.167350761, -7.383676211, -6.35),
    ]]
    fillet(fillet4_edges, radius=FILLET4_R)


solid = part.part
